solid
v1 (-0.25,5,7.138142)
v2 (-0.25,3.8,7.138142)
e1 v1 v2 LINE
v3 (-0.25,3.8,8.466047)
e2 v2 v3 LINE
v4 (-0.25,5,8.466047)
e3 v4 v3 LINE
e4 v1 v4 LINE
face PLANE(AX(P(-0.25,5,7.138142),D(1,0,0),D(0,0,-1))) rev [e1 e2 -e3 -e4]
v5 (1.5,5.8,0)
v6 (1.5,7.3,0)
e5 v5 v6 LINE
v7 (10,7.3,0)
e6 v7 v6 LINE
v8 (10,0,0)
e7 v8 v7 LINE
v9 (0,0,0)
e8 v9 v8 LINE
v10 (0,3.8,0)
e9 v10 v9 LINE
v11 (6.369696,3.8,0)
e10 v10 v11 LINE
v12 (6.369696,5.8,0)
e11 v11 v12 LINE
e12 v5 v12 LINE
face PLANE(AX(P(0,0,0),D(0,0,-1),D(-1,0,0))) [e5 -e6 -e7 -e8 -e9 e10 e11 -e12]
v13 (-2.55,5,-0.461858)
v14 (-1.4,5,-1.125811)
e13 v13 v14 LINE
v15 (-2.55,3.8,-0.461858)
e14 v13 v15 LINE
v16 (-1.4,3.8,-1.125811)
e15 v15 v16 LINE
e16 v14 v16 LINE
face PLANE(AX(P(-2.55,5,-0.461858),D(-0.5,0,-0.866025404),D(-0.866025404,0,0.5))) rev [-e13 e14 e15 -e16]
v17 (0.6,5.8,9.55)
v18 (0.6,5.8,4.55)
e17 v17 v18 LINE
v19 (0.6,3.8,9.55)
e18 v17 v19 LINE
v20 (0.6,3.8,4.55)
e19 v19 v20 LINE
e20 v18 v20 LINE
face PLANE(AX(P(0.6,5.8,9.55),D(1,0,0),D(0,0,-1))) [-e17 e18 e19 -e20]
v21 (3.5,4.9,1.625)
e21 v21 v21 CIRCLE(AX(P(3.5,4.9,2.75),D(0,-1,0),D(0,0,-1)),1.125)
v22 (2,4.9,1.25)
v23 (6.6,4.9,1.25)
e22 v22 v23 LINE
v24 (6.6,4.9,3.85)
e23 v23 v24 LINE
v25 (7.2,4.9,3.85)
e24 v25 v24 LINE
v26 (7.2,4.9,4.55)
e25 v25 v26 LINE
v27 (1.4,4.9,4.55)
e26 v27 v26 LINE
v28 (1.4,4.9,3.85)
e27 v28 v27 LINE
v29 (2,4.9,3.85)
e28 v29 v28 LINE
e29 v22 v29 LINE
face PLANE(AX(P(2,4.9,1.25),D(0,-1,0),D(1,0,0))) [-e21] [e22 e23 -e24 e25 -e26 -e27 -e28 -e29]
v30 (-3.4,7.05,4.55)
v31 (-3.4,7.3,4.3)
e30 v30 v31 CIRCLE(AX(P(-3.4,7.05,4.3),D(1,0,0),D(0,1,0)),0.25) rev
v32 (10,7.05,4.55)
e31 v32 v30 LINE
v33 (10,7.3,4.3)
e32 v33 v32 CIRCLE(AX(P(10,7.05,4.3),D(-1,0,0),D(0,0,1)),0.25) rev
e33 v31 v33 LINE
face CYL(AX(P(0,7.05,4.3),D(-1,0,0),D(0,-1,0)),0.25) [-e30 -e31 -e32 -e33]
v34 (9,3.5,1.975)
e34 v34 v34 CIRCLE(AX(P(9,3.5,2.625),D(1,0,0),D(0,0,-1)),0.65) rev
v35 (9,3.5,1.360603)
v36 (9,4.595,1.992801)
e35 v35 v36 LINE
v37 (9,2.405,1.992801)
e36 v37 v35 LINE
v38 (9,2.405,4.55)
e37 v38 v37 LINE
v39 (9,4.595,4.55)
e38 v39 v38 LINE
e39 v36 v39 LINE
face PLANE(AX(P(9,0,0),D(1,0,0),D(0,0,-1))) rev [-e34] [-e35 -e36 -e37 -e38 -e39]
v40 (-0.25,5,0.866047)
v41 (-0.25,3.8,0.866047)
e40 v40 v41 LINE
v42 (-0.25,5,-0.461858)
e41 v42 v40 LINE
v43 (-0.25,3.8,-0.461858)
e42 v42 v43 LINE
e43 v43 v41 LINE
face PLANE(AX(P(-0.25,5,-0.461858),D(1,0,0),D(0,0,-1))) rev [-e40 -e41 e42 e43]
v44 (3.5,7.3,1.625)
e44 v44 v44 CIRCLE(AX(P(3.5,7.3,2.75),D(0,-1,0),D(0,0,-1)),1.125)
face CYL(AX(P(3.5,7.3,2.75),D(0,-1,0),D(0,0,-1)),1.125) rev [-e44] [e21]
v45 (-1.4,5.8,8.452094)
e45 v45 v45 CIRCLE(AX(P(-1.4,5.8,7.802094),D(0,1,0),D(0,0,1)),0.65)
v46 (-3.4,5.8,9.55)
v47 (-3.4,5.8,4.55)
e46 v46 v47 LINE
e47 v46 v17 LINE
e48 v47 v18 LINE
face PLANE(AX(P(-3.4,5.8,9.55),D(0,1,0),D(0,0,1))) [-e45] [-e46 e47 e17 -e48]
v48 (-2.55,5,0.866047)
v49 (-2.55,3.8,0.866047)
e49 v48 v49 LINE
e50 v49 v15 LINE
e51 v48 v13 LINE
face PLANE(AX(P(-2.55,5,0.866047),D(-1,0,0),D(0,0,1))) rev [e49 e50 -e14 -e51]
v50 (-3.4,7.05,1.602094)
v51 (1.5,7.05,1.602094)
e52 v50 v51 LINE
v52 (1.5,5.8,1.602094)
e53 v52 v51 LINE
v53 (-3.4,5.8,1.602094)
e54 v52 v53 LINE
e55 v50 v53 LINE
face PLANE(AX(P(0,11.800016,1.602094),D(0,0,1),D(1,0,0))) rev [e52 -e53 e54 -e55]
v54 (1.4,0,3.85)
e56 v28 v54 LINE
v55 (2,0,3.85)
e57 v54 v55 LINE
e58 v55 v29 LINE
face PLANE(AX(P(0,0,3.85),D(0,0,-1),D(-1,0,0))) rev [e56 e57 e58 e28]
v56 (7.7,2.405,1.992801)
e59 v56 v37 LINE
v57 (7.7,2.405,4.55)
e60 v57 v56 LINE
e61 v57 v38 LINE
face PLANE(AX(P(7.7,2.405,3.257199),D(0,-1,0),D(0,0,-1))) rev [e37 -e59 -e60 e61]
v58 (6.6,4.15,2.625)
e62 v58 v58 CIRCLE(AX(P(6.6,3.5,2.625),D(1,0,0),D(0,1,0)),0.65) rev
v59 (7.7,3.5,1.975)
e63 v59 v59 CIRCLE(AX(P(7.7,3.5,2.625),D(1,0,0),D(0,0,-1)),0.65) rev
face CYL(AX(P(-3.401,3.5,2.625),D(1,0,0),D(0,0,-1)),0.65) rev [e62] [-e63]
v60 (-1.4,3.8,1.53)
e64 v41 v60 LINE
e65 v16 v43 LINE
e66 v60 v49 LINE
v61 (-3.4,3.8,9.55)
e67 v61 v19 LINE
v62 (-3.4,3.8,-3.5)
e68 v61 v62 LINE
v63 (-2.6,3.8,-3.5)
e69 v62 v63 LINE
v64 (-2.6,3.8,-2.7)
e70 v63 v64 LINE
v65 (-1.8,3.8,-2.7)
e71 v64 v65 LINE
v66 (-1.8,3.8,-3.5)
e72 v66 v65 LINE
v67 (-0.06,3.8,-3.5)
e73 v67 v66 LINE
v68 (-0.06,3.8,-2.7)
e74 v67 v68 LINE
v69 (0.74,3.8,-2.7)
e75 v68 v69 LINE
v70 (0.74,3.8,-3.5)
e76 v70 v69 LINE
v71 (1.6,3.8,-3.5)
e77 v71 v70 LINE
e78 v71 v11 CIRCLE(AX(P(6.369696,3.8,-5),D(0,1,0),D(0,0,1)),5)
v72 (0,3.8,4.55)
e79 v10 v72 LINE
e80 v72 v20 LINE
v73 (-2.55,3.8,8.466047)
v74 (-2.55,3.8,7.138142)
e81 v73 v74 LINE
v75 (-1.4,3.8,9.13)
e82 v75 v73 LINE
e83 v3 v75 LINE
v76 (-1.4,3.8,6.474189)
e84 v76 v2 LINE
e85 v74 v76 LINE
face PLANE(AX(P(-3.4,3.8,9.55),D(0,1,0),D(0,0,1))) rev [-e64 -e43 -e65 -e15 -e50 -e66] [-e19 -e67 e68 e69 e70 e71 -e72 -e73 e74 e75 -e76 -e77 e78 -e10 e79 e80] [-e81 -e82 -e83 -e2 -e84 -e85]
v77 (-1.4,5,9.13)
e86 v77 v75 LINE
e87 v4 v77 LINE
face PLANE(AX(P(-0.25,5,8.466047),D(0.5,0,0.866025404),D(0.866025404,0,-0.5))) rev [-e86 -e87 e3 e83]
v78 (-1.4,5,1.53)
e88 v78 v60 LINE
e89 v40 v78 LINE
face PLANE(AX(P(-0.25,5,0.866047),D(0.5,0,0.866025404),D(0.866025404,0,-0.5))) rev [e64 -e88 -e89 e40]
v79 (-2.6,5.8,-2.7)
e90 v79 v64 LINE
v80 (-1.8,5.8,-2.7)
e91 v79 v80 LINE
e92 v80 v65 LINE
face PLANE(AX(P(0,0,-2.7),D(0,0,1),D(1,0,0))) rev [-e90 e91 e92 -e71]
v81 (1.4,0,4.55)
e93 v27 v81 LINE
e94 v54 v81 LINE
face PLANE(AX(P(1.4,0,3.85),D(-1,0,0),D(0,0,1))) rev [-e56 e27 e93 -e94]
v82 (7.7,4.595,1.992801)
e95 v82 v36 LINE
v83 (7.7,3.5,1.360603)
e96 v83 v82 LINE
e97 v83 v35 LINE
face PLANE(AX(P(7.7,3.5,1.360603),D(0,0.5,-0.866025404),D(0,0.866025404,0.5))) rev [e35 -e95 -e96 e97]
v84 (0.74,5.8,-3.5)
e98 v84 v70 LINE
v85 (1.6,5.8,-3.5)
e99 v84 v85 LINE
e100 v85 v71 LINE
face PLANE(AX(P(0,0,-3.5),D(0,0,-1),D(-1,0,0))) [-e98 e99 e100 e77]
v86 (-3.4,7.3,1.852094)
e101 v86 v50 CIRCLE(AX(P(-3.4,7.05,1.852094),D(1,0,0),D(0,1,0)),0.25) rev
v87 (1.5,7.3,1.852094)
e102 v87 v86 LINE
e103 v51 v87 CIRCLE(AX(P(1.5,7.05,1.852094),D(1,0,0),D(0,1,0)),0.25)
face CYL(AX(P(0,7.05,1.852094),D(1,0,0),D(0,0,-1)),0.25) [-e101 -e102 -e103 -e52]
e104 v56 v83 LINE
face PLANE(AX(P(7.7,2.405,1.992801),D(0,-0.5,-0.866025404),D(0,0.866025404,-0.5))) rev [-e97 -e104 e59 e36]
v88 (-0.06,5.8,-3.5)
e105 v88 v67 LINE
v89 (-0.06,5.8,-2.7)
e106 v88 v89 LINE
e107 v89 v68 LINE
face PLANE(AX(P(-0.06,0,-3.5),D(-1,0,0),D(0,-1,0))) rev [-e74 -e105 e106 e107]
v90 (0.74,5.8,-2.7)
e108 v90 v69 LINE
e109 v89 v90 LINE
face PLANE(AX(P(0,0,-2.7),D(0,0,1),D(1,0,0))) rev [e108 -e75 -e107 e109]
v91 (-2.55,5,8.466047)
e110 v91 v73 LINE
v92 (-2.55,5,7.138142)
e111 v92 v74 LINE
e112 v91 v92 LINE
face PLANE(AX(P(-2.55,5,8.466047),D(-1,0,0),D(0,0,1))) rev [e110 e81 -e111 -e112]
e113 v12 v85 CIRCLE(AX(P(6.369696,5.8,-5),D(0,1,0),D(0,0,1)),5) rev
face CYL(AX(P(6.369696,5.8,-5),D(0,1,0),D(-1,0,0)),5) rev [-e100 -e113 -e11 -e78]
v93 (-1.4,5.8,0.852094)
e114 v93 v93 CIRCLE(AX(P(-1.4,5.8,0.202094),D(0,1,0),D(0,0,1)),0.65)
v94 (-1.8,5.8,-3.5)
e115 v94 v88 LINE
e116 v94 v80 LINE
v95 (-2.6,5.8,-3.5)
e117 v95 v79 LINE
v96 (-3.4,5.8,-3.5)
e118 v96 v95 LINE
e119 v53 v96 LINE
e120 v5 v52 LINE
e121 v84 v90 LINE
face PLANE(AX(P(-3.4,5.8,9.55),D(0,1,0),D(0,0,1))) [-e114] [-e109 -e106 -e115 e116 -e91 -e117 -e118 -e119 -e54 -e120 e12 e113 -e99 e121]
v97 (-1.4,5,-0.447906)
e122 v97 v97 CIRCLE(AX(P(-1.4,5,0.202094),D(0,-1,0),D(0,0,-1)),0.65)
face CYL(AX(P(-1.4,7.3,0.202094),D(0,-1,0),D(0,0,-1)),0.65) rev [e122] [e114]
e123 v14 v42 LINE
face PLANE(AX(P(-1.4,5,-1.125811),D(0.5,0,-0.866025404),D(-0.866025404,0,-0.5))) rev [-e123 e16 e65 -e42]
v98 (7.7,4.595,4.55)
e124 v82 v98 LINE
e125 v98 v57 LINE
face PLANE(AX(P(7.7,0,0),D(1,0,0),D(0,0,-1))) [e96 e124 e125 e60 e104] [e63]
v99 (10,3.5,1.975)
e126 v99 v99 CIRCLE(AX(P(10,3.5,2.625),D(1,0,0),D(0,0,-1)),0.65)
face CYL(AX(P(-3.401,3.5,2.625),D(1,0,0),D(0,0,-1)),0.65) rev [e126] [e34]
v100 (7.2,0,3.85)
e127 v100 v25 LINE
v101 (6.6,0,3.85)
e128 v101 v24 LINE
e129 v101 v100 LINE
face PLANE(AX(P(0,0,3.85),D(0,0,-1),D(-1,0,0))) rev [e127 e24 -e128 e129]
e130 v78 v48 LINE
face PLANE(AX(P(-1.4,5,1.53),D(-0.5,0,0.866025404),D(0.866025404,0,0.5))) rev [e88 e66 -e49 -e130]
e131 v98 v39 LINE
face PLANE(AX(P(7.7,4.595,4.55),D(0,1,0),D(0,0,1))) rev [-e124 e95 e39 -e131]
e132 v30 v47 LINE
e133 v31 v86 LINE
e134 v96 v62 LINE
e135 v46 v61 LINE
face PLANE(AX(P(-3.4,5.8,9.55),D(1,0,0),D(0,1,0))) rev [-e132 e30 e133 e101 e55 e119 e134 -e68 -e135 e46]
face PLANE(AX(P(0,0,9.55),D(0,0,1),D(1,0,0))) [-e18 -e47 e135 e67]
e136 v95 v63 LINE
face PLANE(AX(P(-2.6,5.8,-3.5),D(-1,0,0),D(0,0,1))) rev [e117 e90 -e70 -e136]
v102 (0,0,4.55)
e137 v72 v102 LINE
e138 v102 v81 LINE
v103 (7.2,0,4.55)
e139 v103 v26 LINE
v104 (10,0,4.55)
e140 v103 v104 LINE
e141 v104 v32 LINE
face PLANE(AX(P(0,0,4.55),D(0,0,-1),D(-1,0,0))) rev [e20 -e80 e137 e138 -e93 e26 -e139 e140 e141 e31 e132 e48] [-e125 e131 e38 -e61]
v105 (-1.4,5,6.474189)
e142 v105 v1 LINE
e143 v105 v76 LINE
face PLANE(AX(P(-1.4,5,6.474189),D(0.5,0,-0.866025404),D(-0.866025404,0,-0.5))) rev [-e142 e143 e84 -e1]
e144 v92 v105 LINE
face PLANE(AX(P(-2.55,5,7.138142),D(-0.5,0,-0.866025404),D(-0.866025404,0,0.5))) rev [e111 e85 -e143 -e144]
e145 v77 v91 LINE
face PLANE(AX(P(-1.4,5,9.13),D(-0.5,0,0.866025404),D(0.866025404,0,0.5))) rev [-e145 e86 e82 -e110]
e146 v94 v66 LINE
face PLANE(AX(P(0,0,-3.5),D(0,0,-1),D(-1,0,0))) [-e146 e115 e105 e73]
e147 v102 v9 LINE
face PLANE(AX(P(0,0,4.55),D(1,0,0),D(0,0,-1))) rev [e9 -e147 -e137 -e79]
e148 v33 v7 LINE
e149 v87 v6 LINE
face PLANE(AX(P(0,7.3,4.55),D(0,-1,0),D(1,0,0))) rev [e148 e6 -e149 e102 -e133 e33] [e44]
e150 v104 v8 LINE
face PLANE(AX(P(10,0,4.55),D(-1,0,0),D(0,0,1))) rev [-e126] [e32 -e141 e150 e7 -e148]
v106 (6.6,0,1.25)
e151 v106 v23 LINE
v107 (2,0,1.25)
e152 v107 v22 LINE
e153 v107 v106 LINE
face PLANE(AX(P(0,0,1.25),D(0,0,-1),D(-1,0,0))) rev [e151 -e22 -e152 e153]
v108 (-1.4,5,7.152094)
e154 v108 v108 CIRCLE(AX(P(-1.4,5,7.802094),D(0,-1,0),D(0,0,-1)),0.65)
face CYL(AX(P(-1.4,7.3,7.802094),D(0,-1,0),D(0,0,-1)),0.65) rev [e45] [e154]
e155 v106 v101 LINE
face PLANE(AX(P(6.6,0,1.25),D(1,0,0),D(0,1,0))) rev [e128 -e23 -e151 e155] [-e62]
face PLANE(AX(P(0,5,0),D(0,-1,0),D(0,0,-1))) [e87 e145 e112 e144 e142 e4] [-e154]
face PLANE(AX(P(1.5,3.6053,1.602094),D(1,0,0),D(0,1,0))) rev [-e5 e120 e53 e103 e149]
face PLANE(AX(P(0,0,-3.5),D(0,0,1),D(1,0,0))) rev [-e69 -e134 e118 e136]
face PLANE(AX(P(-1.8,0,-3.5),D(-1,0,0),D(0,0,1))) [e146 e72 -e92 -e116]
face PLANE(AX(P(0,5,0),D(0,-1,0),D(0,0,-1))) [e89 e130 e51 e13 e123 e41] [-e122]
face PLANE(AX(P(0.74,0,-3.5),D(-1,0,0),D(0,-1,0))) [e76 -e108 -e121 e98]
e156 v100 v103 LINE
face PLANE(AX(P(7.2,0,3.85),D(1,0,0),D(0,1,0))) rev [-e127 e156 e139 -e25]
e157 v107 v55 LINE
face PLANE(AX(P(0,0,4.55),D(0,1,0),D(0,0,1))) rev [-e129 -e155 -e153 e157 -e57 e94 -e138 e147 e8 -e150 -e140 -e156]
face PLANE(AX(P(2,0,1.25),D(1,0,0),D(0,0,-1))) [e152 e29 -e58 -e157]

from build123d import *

# Parameters (mm, degrees)
SKETCH2_W                = 10
SKETCH2_H                = 7.3
BOSS_EXTRUDE1_DEPTH      = 4.55
SKETCH3_W                = 4.6
SKETCH3_H                = 4.9
CUT_EXTRUDE1_DEPTH       = 3.3
BOSS_EXTRUDE2_DEPTH      = 9.55
BOSS_EXTRUDE2_DEPTH_BACK = 2.7
SKETCH5_W                = 4
SKETCH5_H                = 2
BOSS_EXTRUDE3_REACH      = 19.417
SKETCH13_W               = 5
SKETCH13_H               = 2
SKETCH6_W                = 1.74
SKETCH6_H                = 2
SKETCH6_W_2              = 0.86
SKETCH6_W_3              = 0.8
BOSS_EXTRUDE4_DEPTH      = 0.8
FILLET1_R                = 5
CUT_EXTRUDE2_DEPTH       = 1.2
SKETCH8_R                = 0.65
CUT_EXTRUDE3_DEPTH       = 15.703826033
SKETCH9_R                = 1.125
CUT_EXTRUDE4_DEPTH       = 15.670122699
CUT_EXTRUDE5_REACH       = 20.001
SKETCH10_R               = 0.65
CUT_EXTRUDE6_DEPTH       = 1.3
SKETCH14_W               = 3.4
SKETCH14_H               = 2.947905619
BOSS_EXTRUDE6_DEPTH      = 1.5
SKETCH15_W               = 1.5
SKETCH15_H               = 1.602094381
CUT_EXTRUDE7_DEPTH       = 1.5
FILLET2_R                = 0.25
SKETCH16_W               = 5.8
SKETCH16_H               = 4.9
CUT_EXTRUDE8_DEPTH       = 0.7


with BuildPart() as part:
    # Sketch2 → Boss-Extrude1 (new body)
    with BuildSketch(Plane.XY):
        with Locations((5, 3.65)):
            Rectangle(SKETCH2_W, SKETCH2_H)
    extrude(amount=BOSS_EXTRUDE1_DEPTH)

    # Sketch3 → Cut-Extrude1 (cut)
    with BuildSketch(Plane.XY.offset(4.55)):
        with Locations((4.3, 2.45)):
            Rectangle(SKETCH3_W, SKETCH3_H)
    extrude(amount=-CUT_EXTRUDE1_DEPTH, mode=Mode.SUBTRACT)

    # Sketch5 → Boss-Extrude2 (add, two sides: drawn at the far end of the back side and taken through both)
    with BuildSketch(Plane.XY.offset(-BOSS_EXTRUDE2_DEPTH_BACK)):
        with Locations((-1.4, 4.8)):
            Rectangle(SKETCH5_W, SKETCH5_H)
    extrude(amount=BOSS_EXTRUDE2_DEPTH + BOSS_EXTRUDE2_DEPTH_BACK)

    # Sketch13 → Boss-Extrude3 (add, up to next)
    with BuildSketch(Plane(origin=(0, 0, -2.7), x_dir=(-1, 0, 0), z_dir=(0, 0, -1)), mode=Mode.PRIVATE) as boss_extrude3_sk1:
        with Locations((0.9, 4.8)):
            Rectangle(SKETCH13_W, SKETCH13_H)
    boss_extrude3_tool1 = extrude(boss_extrude3_sk1.sketch, amount=-BOSS_EXTRUDE3_REACH, mode=Mode.PRIVATE) - part.part
    add(boss_extrude3_tool1.solids().sort_by_distance((-0.9, 4.8, -2.7))[0])

    # Sketch6 → Boss-Extrude4 (add)
    with BuildSketch(Plane(origin=(0, 0, -2.7), x_dir=(-1, 0, 0), z_dir=(0, 0, -1))):
        with Locations((0.93, 4.8)):
            Rectangle(SKETCH6_W, SKETCH6_H)
        with Locations((-1.17, 4.8)):
            Rectangle(SKETCH6_W_2, SKETCH6_H)
        with Locations((3, 4.8)):
            Rectangle(SKETCH6_W_3, SKETCH6_H)
    extrude(amount=BOSS_EXTRUDE4_DEPTH)

    # Fillet1
    # the kernel refuses this fillet: 5 mm, written as the material it adds along each edge
    with BuildSketch(Plane(origin=(1.6, 3.8, 0), x_dir=(0, 0, -1), z_dir=(0, 1, 0))) as fillet1_piece_1:
        with BuildLine():
            CenterArc((5, -4.769696007), FILLET1_R, 107.457603124, 72.542396876)
            Line((0, -4.769696007), (-0.1, -4.769696007))
            Line((-0.1, -4.769696007), (-0.1, 0))
            Line((-0.1, 0), (0, 0.1))
            ThreePointArc((0, 0.1), (1.75, 0.1), (3.47, 0.09539392))
            Line((3.47, 0.09539392), (3.5, 0))
        make_face()
    extrude(amount=2)

    # Sketch7 → Cut-Extrude2 (cut)
    with BuildSketch(Plane(origin=(0, 3.8, 0), x_dir=(-1, 0, 0), z_dir=(0, -1, 0))):
        Polygon((0.25, -7.138141571), (0.25, -8.46604719), (1.4, -9.13), (2.55, -8.46604719), (2.55, -7.138141571), (1.4, -6.474188762), align=None)
        Polygon((1.4, 1.125811238), (0.25, 0.461858429), (0.25, -0.86604719), (1.4, -1.53), (2.55, -0.86604719), (2.55, 0.461858429), align=None)
    extrude(amount=-CUT_EXTRUDE2_DEPTH, mode=Mode.SUBTRACT)

    # Sketch8 → Cut-Extrude3 (cut, through all)
    with BuildSketch(Plane.XZ.offset(-5)):
        with Locations(Location((-1.4, 7.802094381, 0), (0, 0, 270))):
            Circle(SKETCH8_R)
        with Locations(Location((-1.4, 0.202094381, 0), (0, 0, 270))):
            Circle(SKETCH8_R)
    extrude(amount=-CUT_EXTRUDE3_DEPTH, mode=Mode.SUBTRACT)

    # Sketch9 → Cut-Extrude4 (cut, through all)
    with BuildSketch(Plane.XZ.offset(-4.9)):
        with Locations(Location((3.5, 2.75, 0), (0, 0, 270))):
            Circle(SKETCH9_R)
    extrude(amount=-CUT_EXTRUDE4_DEPTH, mode=Mode.SUBTRACT)

    # Sketch10 → Cut-Extrude5 (cut, up to next)
    with BuildSketch(Plane(origin=(10, 0, 0), x_dir=(0, 0, -1), z_dir=(1, 0, 0)), mode=Mode.PRIVATE) as cut_extrude5_sk1:
        with Locations((-2.625, 3.5)):
            Circle(SKETCH10_R)
    cut_extrude5_tool1 = extrude(cut_extrude5_sk1.sketch, amount=-CUT_EXTRUDE5_REACH, mode=Mode.PRIVATE) & part.part
    add(cut_extrude5_tool1.solids().sort_by_distance((10, 3.5, 2.625))[0], mode=Mode.SUBTRACT)

    # Sketch12 → Cut-Extrude6 (cut)
    with BuildSketch(Plane(origin=(9, 0, 0), x_dir=(0, 0, -1), z_dir=(1, 0, 0))):
        Polygon((-3.257198545, 2.405), (-4.55, 2.405), (-4.55, 4.595), (-3.257198545, 4.595), (-1.992801455, 4.595), (-1.36060291, 3.5), (-1.992801455, 2.405), align=None)
    extrude(amount=-CUT_EXTRUDE6_DEPTH, mode=Mode.SUBTRACT)

    # Sketch14 → Boss-Extrude6 (add)
    with BuildSketch(Plane(origin=(0, 5.8, 0), x_dir=(1, 0, 0), z_dir=(0, 1, 0))):
        with Locations((-1.7, -3.076047191)):
            Rectangle(SKETCH14_W, SKETCH14_H)
    extrude(amount=BOSS_EXTRUDE6_DEPTH)

    # Sketch15 → Cut-Extrude7 (cut)
    with BuildSketch(Plane(origin=(0, 7.3, 0), x_dir=(1, 0, 0), z_dir=(0, 1, 0))):
        with Locations((0.75, -0.801047191)):
            Rectangle(SKETCH15_W, SKETCH15_H)
    extrude(amount=-CUT_EXTRUDE7_DEPTH, mode=Mode.SUBTRACT)

    # Fillet2
    fillet2_edges = [part.edges().sort_by_distance(p)[0] for p in [
        (3.3, 7.3, 4.55),
        (-0.95, 7.3, 1.602094381),
    ]]
    fillet(fillet2_edges, radius=FILLET2_R)

    # Sketch16 → Cut-Extrude8 (cut)
    with BuildSketch(Plane.XY.offset(4.55)):
        with Locations((4.3, 2.45)):
            Rectangle(SKETCH16_W, SKETCH16_H)
    extrude(amount=-CUT_EXTRUDE8_DEPTH, mode=Mode.SUBTRACT)


solid = part.part
